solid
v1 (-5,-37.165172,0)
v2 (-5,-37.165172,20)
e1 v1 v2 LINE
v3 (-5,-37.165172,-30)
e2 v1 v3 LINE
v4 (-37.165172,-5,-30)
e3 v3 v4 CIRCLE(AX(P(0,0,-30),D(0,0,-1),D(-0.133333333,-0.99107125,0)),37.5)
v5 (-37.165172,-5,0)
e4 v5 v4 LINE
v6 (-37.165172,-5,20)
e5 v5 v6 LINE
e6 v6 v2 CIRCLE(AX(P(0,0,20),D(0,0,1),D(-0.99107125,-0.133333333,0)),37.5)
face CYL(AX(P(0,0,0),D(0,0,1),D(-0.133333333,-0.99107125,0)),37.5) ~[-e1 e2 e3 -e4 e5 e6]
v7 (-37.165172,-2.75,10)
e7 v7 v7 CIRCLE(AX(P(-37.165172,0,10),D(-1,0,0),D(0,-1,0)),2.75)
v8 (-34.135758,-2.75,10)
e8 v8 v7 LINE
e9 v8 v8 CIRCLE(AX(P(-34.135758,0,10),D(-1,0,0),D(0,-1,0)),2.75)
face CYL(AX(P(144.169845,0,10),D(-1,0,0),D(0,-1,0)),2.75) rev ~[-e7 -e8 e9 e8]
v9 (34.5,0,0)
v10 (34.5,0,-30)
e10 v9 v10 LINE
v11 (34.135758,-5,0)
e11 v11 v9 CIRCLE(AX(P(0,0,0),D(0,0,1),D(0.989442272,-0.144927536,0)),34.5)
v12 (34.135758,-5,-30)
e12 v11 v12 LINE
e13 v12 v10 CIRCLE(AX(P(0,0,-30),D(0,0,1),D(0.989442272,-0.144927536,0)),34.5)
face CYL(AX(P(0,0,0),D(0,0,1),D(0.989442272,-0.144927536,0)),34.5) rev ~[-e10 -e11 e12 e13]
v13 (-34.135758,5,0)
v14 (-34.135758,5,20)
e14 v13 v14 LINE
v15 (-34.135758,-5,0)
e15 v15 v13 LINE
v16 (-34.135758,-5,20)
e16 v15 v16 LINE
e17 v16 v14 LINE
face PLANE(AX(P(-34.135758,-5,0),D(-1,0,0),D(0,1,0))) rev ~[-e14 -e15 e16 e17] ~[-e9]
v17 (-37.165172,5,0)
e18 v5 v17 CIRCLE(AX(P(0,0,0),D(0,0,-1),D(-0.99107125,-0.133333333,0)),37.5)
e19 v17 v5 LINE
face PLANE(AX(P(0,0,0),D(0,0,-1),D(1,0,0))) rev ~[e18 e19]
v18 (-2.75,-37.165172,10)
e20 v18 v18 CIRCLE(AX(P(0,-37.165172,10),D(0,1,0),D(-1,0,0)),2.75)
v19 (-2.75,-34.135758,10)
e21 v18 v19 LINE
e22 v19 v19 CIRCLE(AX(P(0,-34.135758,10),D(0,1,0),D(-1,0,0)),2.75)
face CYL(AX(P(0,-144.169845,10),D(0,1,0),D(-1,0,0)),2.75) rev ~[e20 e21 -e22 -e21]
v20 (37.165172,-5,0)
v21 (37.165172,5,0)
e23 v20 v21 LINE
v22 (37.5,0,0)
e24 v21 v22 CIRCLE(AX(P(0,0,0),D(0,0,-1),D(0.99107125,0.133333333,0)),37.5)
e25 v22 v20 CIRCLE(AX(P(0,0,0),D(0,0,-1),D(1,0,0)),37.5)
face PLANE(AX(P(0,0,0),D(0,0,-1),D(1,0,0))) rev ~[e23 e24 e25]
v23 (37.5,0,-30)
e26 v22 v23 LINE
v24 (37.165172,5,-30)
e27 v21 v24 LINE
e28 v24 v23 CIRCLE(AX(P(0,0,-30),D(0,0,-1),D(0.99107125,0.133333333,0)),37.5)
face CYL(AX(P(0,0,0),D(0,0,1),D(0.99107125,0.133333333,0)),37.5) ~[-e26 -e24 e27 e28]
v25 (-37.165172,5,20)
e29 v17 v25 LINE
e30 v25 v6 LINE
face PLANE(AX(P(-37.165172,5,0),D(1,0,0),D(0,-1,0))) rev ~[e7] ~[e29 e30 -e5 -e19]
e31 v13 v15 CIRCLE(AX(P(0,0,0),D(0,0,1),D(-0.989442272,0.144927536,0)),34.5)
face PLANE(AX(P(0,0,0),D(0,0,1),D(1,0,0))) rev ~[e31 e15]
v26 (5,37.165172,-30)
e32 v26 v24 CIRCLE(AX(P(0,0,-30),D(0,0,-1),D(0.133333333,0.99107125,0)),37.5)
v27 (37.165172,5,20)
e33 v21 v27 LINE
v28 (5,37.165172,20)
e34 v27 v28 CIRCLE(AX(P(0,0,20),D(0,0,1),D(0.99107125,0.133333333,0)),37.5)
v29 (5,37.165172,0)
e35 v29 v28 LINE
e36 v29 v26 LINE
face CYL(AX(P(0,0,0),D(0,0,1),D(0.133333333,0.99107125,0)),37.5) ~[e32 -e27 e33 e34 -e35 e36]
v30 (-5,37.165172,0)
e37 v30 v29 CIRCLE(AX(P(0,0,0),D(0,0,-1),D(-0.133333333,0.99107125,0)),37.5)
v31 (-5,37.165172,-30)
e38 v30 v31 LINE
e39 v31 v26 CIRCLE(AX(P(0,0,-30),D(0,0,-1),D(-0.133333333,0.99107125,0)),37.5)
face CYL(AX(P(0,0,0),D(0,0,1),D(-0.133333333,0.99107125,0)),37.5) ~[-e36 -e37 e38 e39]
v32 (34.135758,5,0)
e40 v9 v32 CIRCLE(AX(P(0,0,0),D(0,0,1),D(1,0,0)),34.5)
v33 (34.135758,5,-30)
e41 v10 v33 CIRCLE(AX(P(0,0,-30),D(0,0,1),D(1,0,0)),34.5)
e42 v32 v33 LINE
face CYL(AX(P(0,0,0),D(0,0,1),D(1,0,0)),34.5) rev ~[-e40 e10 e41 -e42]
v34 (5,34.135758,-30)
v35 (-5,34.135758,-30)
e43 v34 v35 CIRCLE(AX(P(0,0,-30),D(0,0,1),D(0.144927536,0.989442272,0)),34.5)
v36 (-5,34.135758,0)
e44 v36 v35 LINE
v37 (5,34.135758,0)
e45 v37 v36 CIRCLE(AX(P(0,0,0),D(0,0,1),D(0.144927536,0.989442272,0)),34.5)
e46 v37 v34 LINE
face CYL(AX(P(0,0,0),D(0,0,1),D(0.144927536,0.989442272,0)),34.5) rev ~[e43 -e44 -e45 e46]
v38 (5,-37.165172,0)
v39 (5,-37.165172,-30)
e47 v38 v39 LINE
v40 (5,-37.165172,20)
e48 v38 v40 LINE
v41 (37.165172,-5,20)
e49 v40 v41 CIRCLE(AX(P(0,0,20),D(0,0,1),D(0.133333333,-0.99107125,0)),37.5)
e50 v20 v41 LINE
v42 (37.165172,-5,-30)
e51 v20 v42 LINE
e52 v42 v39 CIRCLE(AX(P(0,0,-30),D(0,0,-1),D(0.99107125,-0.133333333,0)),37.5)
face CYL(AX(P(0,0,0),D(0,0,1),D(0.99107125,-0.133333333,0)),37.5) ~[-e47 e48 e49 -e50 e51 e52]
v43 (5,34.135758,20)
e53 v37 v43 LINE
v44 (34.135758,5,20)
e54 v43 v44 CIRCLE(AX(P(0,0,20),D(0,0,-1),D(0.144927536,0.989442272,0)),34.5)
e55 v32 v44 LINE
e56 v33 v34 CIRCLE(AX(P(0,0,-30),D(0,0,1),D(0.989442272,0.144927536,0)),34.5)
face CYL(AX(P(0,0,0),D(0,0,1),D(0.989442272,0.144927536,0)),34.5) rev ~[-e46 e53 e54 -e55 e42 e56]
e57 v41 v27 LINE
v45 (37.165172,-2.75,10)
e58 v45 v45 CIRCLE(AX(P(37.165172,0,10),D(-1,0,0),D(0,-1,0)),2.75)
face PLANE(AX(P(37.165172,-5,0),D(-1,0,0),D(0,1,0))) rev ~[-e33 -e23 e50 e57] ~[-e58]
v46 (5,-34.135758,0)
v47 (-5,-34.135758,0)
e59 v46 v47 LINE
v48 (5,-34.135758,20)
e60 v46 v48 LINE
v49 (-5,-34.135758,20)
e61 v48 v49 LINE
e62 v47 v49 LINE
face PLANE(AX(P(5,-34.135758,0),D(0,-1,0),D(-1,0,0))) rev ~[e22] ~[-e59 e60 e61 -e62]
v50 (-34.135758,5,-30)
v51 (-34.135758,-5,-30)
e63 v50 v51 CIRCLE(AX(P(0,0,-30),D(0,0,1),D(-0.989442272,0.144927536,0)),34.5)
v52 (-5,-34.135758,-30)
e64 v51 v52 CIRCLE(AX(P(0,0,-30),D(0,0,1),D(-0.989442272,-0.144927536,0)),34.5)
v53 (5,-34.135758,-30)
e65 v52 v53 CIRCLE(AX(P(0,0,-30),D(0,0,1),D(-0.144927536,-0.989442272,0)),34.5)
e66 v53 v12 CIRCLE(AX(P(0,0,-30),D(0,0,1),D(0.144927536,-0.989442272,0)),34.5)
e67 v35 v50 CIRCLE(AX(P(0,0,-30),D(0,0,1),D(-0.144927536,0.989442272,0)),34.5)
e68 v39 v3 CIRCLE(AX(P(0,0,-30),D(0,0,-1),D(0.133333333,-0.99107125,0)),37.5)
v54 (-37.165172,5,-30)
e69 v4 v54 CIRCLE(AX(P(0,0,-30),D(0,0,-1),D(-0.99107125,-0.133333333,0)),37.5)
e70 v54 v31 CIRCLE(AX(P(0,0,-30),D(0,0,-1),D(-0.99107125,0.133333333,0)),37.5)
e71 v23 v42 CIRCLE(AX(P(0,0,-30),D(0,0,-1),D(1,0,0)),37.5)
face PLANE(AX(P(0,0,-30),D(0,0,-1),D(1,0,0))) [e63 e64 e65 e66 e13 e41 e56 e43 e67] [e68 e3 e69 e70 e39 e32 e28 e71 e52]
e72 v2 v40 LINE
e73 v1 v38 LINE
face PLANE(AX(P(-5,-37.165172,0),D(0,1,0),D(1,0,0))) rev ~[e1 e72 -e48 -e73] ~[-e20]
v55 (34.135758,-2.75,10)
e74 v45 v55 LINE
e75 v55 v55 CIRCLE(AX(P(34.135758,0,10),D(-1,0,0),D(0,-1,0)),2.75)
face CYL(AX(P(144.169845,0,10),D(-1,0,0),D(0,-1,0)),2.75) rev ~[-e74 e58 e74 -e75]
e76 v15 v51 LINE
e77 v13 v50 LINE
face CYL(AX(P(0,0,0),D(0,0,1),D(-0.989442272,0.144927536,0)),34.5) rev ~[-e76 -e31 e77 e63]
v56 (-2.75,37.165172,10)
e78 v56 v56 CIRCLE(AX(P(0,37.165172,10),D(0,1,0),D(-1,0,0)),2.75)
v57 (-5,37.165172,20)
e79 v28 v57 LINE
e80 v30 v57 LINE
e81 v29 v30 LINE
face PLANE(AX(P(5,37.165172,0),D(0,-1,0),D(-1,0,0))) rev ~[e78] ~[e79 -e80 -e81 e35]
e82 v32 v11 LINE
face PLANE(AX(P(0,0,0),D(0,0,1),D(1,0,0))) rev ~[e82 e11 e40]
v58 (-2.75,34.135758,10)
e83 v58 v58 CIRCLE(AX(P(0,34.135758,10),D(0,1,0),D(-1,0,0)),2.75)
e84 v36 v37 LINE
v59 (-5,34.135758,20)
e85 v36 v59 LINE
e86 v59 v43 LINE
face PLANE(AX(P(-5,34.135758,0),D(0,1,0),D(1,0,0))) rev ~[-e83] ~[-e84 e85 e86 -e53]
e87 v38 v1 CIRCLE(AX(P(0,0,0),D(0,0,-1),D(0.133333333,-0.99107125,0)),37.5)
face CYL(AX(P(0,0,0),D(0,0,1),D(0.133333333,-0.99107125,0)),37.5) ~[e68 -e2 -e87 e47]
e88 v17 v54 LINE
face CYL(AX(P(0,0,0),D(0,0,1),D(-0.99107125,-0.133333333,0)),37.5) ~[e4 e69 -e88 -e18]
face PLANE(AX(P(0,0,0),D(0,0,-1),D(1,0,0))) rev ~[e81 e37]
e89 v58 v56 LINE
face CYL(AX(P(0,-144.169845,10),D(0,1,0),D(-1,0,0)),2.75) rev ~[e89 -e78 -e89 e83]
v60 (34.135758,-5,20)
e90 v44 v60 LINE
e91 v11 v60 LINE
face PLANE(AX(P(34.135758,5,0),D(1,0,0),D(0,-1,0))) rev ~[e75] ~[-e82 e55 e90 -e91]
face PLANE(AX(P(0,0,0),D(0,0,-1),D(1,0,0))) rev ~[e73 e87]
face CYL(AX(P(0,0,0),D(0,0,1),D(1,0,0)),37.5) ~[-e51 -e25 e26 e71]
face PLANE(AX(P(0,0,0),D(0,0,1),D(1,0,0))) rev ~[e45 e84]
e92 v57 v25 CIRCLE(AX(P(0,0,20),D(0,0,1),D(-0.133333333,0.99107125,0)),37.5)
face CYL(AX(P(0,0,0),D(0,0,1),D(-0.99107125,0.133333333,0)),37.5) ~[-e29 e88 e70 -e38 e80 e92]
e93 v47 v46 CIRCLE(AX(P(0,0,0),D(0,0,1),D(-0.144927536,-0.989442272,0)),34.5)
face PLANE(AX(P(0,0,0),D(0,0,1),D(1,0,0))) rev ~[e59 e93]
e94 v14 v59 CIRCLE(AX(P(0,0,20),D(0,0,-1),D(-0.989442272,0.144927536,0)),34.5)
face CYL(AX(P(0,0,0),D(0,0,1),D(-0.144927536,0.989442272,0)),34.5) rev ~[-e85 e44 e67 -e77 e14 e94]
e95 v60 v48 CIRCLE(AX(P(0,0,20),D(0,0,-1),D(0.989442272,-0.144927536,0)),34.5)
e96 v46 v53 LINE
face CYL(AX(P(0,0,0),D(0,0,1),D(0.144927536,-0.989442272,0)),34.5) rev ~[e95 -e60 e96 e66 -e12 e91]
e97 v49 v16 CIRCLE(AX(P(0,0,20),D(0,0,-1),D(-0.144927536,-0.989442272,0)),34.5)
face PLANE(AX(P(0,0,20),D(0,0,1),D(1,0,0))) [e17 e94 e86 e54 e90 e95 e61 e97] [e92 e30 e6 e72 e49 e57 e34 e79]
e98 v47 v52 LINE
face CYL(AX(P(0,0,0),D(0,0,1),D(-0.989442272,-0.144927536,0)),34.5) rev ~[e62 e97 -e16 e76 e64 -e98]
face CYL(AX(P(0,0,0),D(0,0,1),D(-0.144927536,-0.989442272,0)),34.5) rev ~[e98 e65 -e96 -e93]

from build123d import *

# Parameters (mm, degrees)
F1_DEPTH = 20
F3_D     = 5.5
F5_D     = 5.5
F7_DEPTH = 30


# Not quite as in the source:
# - after a boolean that leaves OpenCascade's solid faulty, fix() repairs it


with BuildPart() as f1:
    # F0 (on Top) → F1 (new body)
    with BuildSketch(Plane.XY):
        with BuildLine():
            Line((37.1651718683, -5), (37.1651718683, 5))
            ThreePointArc((37.1651718683, 5), (26.5165042945, 26.5165042945), (5, 37.1651718683))
            Line((5, 37.1651718683), (-5, 37.1651718683))
            ThreePointArc((-5, 37.1651718683), (-26.5165042945, 26.5165042945), (-37.1651718683, 5))
            Line((-37.1651718683, 5), (-37.1651718683, -5))
            ThreePointArc((-37.1651718683, -5), (-26.5165042945, -26.5165042945), (-5, -37.1651718683))
            Line((-5, -37.1651718683), (5, -37.1651718683))
            ThreePointArc((5, -37.1651718683), (26.5165042945, -26.5165042945), (37.1651718683, -5))
        make_face()
        with BuildLine():
            ThreePointArc((-5, -34.1357583774), (-24.3951839509, -24.3951839509), (-34.1357583774, -5))
            Line((-34.1357583774, -5), (-34.1357583774, 5))
            ThreePointArc((-34.1357583774, 5), (-24.3951839509, 24.3951839509), (-5, 34.1357583774))
            Line((-5, 34.1357583774), (5, 34.1357583774))
            ThreePointArc((5, 34.1357583774), (24.3951839509, 24.3951839509), (34.1357583774, 5))
            Line((34.1357583774, 5), (34.1357583774, -5))
            ThreePointArc((34.1357583774, -5), (24.3951839509, -24.3951839509), (5, -34.1357583774))
            Line((5, -34.1357583774), (-5, -34.1357583774))
        make_face(mode=Mode.SUBTRACT)
    extrude(amount=F1_DEPTH)

    # F3 (through all)
    with Locations(Plane.YZ.offset(37.1651718683)):
        with Locations((0, 10)):
            Hole(F3_D / 2)

    # F5 (through all)
    with Locations(Plane.XZ.offset(37.1651718683)):
        with Locations((0, 10)):
            Hole(F5_D / 2)

    # F6 (on face) → F7 (join)
    with BuildSketch(Plane(origin=(0, 0, 0), x_dir=(1, 0, 0), z_dir=(0, 0, -1))):
        with BuildLine():
            Line((37.1651718683, -5), (37.1651718683, 5))
            ThreePointArc((37.1651718683, 5), (26.5165042945, 26.5165042945), (5, 37.1651718683))
            Line((5, 37.1651718683), (-5, 37.1651718683))
            ThreePointArc((-5, 37.1651718683), (-26.5165042945, 26.5165042945), (-37.1651718683, 5))
            Line((-37.1651718683, 5), (-37.1651718683, -5))
            ThreePointArc((-37.1651718683, -5), (-26.5165042945, -26.5165042945), (-5, -37.1651718683))
            Line((-5, -37.1651718683), (5, -37.1651718683))
            ThreePointArc((5, -37.1651718683), (26.5165042945, -26.5165042945), (37.1651718683, -5))
        make_face()
        with BuildLine():
            ThreePointArc((34.1357583774, 5), (34.4088191022, 2.5066248203), (34.5, 0))
            ThreePointArc((34.5, 0), (34.4088191022, -2.5066248203), (34.1357583774, -5))
            ThreePointArc((34.1357583774, -5), (24.3951839509, -24.3951839509), (5, -34.1357583774))
            ThreePointArc((5, -34.1357583774), (0, -34.5), (-5, -34.1357583774))
            ThreePointArc((-5, -34.1357583774), (-24.3951839509, -24.3951839509), (-34.1357583774, -5))
            ThreePointArc((-34.1357583774, -5), (-34.5, 0), (-34.1357583774, 5))
            ThreePointArc((-34.1357583774, 5), (-24.3951839509, 24.3951839509), (-5, 34.1357583774))
            ThreePointArc((-5, 34.1357583774), (0, 34.5), (5, 34.1357583774))
            ThreePointArc((5, 34.1357583774), (24.3951839509, 24.3951839509), (34.1357583774, 5))
        make_face(mode=Mode.SUBTRACT)
        with BuildLine():
            Line((-5, 37.1651718683), (5, 37.1651718683))
            ThreePointArc((5, 37.1651718683), (0, 37.5), (-5, 37.1651718683))
        make_face()
        with BuildLine():
            ThreePointArc((37.1651718683, -5), (37.4161993331, -2.5055992236), (37.5, 0))
            ThreePointArc((37.5, 0), (37.4161993331, 2.5055992236), (37.1651718683, 5))
            Line((37.1651718683, 5), (37.1651718683, -5))
        make_face()
        with BuildLine():
            ThreePointArc((-5, -37.1651718683), (0, -37.5), (5, -37.1651718683))
            Line((5, -37.1651718683), (-5, -37.1651718683))
        make_face()
        with BuildLine():
            Line((-37.1651718683, -5), (-37.1651718683, 5))
            ThreePointArc((-37.1651718683, 5), (-37.5, 0), (-37.1651718683, -5))
        make_face()
    extrude(amount=F7_DEPTH)

    add(f1.part.fix(), mode=Mode.REPLACE)


solid = f1.part
